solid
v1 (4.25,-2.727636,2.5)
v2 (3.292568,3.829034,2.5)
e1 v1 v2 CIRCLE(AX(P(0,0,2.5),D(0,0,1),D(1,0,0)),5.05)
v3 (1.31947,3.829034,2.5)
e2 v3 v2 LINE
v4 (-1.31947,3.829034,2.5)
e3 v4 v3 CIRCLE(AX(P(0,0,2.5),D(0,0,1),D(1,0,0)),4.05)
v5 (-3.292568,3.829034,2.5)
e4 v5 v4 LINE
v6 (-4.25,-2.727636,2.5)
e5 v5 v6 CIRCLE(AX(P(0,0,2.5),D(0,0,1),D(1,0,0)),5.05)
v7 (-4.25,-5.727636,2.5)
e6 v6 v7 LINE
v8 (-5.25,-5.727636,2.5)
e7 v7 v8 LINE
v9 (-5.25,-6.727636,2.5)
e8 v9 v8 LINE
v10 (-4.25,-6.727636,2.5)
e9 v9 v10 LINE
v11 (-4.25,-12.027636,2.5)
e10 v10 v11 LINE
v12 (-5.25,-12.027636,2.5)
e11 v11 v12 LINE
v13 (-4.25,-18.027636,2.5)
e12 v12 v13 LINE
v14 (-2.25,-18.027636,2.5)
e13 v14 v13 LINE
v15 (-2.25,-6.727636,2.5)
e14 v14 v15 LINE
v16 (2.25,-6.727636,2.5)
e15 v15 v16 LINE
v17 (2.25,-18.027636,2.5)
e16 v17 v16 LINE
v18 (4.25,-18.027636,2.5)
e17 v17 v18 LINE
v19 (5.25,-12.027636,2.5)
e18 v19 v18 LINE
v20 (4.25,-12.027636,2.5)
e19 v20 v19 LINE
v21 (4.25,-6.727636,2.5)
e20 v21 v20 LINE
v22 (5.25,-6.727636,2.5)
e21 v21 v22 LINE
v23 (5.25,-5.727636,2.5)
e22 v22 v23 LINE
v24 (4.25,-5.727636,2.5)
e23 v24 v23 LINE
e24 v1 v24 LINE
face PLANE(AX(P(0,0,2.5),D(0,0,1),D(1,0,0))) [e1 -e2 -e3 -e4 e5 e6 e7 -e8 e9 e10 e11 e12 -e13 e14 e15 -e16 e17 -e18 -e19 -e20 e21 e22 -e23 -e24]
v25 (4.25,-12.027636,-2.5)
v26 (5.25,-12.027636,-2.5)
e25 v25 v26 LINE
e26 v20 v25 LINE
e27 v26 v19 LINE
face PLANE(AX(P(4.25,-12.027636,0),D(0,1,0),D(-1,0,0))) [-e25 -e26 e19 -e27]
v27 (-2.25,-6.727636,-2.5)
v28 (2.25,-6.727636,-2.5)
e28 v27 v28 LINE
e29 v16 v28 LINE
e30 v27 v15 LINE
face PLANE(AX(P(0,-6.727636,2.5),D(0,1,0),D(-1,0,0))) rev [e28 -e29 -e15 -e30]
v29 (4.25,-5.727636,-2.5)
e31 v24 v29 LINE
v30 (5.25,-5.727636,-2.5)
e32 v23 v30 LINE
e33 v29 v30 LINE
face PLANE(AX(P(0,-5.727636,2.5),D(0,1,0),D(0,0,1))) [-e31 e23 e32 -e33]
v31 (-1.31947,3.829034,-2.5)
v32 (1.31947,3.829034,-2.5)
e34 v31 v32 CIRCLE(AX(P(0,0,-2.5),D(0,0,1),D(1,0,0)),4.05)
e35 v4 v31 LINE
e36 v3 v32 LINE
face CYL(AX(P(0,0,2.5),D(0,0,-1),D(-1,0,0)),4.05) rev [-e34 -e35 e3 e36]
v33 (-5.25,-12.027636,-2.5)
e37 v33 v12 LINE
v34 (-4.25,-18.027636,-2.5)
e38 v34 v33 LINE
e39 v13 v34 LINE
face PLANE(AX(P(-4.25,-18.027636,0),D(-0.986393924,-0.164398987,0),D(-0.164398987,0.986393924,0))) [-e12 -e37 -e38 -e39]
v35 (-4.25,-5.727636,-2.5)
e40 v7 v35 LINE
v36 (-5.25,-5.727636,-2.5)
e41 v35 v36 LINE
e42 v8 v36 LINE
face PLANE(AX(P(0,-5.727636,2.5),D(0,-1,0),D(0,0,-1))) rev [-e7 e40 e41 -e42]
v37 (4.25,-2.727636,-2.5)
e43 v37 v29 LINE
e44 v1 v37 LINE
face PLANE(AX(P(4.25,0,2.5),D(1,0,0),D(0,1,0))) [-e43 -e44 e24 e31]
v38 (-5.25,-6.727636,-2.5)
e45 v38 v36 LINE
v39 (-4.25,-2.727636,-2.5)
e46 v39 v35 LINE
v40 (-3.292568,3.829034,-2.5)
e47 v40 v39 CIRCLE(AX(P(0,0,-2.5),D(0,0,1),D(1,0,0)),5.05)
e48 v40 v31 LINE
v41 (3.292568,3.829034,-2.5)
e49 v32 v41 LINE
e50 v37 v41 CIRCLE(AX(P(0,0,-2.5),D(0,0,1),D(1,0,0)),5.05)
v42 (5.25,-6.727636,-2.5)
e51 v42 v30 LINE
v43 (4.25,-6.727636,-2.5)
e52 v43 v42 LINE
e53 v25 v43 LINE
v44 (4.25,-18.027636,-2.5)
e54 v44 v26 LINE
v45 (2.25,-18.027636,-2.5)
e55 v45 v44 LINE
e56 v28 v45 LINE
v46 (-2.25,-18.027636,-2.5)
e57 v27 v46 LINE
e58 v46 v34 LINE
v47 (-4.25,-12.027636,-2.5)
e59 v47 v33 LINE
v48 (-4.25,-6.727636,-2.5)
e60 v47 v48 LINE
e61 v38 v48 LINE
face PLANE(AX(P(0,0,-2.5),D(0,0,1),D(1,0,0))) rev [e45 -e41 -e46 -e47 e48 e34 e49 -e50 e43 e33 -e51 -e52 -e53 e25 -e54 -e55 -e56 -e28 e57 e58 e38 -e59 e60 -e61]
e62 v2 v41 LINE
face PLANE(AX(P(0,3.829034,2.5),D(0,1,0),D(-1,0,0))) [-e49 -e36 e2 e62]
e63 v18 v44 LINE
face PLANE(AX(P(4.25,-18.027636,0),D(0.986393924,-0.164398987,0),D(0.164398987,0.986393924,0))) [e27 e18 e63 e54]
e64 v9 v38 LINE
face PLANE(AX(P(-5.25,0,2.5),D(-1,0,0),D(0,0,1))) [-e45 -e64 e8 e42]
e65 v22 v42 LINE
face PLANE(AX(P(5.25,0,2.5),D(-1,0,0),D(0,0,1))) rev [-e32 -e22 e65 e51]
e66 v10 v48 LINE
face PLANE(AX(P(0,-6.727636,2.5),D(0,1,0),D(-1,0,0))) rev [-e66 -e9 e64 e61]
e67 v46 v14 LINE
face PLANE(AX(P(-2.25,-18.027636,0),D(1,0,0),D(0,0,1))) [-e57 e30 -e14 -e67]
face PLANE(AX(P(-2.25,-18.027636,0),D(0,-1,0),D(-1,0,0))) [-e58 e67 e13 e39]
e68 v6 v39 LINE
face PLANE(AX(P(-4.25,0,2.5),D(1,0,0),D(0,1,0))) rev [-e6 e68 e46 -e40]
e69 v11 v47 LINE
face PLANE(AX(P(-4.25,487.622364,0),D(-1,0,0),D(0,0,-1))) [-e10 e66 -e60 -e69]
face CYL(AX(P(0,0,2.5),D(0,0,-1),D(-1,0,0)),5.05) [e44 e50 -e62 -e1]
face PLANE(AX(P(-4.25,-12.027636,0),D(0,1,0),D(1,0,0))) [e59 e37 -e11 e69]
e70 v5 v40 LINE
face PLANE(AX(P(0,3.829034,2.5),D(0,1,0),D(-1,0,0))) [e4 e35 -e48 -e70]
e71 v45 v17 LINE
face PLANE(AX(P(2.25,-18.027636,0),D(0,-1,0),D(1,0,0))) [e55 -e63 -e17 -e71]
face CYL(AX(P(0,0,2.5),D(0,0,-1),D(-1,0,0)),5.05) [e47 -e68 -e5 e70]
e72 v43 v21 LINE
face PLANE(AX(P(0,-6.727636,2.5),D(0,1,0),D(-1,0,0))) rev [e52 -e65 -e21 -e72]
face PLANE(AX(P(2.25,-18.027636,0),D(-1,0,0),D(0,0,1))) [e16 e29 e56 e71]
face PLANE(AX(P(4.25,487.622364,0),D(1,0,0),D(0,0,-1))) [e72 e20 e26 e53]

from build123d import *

# Parameters (mm, degrees)
SKETCH2_W           = 1
SKETCH2_H           = 1.0000000000000009
BOSS_EXTRUDE1_DEPTH = 2.5
SNAP_START          = -2.5
SNAP_HOOK2_DEPTH    = 5


# Read off the part's stored shape, not the designer's step: Snap Hook2
with BuildPart() as part:
    # Sketch2 → Boss-Extrude1 (new, symmetric)
    with BuildSketch(Plane.XY):
        with BuildLine():
            Line((-1.319469931058069, 3.8290337033034687), (-3.2925675238278904, 3.8290337033034683))
            ThreePointArc((-3.2925675238278913, 3.829033703303468), (-4.9970052756714, 0.7296836814073608), (-4.25, -2.727636339397171))
            Line((-4.249999999999999, -2.7276363393971716), (-2.9937434759844463, -2.7276363393971716))
            ThreePointArc((-2.9937434759844717, -2.7276363393972467), (-3.9240837129048374, 1.0020314436757887), (-1.319469931058064, 3.829033703303436))
        make_face()
        with BuildLine():
            ThreePointArc((5.05, 0), (4.589660444702355, 2.1065414789019883), (3.29256752382789, 3.8290337033034683))
            Line((3.2925675238278904, 3.829033703303469), (1.3194699310580464, 3.8290337033034687))
            ThreePointArc((1.3194699310580424, 3.8290337033034434), (3.2974500163599956, 2.351451336857189), (4.05, 0))
            ThreePointArc((4.05, -9.9e-16), (3.7767155755853006, -1.4625045166191415), (2.9937434759845, -2.7276363393972156))
            Line((2.993743475984485, -2.7276363393971708), (4.250000000000001, -2.7276363393971708))
            ThreePointArc((4.25, -2.7276363393971708), (4.84587453407535, -1.421267040355192), (5.05, -1.24e-15))
        make_face()
        with BuildLine():
            Line((-2.9937434759844463, -2.7276363393971716), (-4.249999999999999, -2.7276363393971716))
            ThreePointArc((-4.25, -2.727636339397171), (-2.421563181711757, -4.431538305935991), (7.981e-14, -5.05))
            Line((1.49e-15, -5.05), (1.34e-15, -4.05))
            ThreePointArc((-5.11e-14, -4.05), (-1.636394332891877, -3.7046880553265678), (-2.9937434759844717, -2.7276363393972467))
        make_face()
        with BuildLine():
            Line((1.34e-15, -4.05), (1.49e-15, -5.05))
            ThreePointArc((7.981e-14, -5.05), (2.4215631817118264, -4.431538305935953), (4.25, -2.7276363393971708))
            Line((4.250000000000001, -2.7276363393971708), (2.993743475984485, -2.7276363393971708))
            ThreePointArc((2.9937434759845, -2.7276363393972156), (1.6363943328918495, -3.7046880553265797), (-5.11e-14, -4.05))
        make_face()
        with BuildLine():
            ThreePointArc((7.981e-14, -5.05), (-2.421563181711757, -4.431538305935991), (-4.25, -2.727636339397171))
            Line((-4.249999999999999, -2.7276363393971716), (-4.249999999999998, -5.727636339397171))
            Line((-4.249999999999998, -5.727636339397171), (-4.249999999999998, -6.727636339397172))
            Line((-4.249999999999998, -6.727636339397172), (1.78e-15, -6.727636339397172))
            Line((1.73e-15, -6.727636339397171), (1.49e-15, -5.05))
        make_face()
        with Locations((-4.749999999999998, -6.227636339397172)):
            Rectangle(SKETCH2_W, SKETCH2_H)
        with BuildLine():
            ThreePointArc((4.25, -2.7276363393971708), (2.4215631817118264, -4.431538305935953), (7.981e-14, -5.05))
            Line((1.49e-15, -5.05), (1.73e-15, -6.727636339397171))
            Line((1.78e-15, -6.727636339397172), (4.250000000000002, -6.727636339397171))
            Line((4.250000000000002, -6.72763633939717), (4.250000000000002, -5.72763633939717))
            Line((4.250000000000002, -5.72763633939717), (4.250000000000001, -2.7276363393971708))
        make_face()
        Polygon((4.250000000000002, -5.72763633939717), (4.250000000000002, -6.72763633939717), (5.250000000000002, -6.727636339397171), (5.250000000000002, -5.72763633939717), align=None)
    extrude(amount=BOSS_EXTRUDE1_DEPTH, both=True)

    # Snap Hook2 outline → Snap Hook2 (add)
    with BuildSketch(Plane.XY.offset(SNAP_START)):
        Polygon((5.25, -12.027636339), (4.25, -12.027636339), (4.25, -6.727636339), (2.25, -6.727636339), (2.25, -18.027636339), (4.25, -18.027636339), align=None)
    snap_hook2 = extrude(amount=SNAP_HOOK2_DEPTH)

    # Mirror1: Snap Hook2 across plane
    add(snap_hook2.mirror(Plane(origin=(0, 0, 0), x_dir=(0, 0, 1), z_dir=(1, 0, 0))))


solid = part.part
